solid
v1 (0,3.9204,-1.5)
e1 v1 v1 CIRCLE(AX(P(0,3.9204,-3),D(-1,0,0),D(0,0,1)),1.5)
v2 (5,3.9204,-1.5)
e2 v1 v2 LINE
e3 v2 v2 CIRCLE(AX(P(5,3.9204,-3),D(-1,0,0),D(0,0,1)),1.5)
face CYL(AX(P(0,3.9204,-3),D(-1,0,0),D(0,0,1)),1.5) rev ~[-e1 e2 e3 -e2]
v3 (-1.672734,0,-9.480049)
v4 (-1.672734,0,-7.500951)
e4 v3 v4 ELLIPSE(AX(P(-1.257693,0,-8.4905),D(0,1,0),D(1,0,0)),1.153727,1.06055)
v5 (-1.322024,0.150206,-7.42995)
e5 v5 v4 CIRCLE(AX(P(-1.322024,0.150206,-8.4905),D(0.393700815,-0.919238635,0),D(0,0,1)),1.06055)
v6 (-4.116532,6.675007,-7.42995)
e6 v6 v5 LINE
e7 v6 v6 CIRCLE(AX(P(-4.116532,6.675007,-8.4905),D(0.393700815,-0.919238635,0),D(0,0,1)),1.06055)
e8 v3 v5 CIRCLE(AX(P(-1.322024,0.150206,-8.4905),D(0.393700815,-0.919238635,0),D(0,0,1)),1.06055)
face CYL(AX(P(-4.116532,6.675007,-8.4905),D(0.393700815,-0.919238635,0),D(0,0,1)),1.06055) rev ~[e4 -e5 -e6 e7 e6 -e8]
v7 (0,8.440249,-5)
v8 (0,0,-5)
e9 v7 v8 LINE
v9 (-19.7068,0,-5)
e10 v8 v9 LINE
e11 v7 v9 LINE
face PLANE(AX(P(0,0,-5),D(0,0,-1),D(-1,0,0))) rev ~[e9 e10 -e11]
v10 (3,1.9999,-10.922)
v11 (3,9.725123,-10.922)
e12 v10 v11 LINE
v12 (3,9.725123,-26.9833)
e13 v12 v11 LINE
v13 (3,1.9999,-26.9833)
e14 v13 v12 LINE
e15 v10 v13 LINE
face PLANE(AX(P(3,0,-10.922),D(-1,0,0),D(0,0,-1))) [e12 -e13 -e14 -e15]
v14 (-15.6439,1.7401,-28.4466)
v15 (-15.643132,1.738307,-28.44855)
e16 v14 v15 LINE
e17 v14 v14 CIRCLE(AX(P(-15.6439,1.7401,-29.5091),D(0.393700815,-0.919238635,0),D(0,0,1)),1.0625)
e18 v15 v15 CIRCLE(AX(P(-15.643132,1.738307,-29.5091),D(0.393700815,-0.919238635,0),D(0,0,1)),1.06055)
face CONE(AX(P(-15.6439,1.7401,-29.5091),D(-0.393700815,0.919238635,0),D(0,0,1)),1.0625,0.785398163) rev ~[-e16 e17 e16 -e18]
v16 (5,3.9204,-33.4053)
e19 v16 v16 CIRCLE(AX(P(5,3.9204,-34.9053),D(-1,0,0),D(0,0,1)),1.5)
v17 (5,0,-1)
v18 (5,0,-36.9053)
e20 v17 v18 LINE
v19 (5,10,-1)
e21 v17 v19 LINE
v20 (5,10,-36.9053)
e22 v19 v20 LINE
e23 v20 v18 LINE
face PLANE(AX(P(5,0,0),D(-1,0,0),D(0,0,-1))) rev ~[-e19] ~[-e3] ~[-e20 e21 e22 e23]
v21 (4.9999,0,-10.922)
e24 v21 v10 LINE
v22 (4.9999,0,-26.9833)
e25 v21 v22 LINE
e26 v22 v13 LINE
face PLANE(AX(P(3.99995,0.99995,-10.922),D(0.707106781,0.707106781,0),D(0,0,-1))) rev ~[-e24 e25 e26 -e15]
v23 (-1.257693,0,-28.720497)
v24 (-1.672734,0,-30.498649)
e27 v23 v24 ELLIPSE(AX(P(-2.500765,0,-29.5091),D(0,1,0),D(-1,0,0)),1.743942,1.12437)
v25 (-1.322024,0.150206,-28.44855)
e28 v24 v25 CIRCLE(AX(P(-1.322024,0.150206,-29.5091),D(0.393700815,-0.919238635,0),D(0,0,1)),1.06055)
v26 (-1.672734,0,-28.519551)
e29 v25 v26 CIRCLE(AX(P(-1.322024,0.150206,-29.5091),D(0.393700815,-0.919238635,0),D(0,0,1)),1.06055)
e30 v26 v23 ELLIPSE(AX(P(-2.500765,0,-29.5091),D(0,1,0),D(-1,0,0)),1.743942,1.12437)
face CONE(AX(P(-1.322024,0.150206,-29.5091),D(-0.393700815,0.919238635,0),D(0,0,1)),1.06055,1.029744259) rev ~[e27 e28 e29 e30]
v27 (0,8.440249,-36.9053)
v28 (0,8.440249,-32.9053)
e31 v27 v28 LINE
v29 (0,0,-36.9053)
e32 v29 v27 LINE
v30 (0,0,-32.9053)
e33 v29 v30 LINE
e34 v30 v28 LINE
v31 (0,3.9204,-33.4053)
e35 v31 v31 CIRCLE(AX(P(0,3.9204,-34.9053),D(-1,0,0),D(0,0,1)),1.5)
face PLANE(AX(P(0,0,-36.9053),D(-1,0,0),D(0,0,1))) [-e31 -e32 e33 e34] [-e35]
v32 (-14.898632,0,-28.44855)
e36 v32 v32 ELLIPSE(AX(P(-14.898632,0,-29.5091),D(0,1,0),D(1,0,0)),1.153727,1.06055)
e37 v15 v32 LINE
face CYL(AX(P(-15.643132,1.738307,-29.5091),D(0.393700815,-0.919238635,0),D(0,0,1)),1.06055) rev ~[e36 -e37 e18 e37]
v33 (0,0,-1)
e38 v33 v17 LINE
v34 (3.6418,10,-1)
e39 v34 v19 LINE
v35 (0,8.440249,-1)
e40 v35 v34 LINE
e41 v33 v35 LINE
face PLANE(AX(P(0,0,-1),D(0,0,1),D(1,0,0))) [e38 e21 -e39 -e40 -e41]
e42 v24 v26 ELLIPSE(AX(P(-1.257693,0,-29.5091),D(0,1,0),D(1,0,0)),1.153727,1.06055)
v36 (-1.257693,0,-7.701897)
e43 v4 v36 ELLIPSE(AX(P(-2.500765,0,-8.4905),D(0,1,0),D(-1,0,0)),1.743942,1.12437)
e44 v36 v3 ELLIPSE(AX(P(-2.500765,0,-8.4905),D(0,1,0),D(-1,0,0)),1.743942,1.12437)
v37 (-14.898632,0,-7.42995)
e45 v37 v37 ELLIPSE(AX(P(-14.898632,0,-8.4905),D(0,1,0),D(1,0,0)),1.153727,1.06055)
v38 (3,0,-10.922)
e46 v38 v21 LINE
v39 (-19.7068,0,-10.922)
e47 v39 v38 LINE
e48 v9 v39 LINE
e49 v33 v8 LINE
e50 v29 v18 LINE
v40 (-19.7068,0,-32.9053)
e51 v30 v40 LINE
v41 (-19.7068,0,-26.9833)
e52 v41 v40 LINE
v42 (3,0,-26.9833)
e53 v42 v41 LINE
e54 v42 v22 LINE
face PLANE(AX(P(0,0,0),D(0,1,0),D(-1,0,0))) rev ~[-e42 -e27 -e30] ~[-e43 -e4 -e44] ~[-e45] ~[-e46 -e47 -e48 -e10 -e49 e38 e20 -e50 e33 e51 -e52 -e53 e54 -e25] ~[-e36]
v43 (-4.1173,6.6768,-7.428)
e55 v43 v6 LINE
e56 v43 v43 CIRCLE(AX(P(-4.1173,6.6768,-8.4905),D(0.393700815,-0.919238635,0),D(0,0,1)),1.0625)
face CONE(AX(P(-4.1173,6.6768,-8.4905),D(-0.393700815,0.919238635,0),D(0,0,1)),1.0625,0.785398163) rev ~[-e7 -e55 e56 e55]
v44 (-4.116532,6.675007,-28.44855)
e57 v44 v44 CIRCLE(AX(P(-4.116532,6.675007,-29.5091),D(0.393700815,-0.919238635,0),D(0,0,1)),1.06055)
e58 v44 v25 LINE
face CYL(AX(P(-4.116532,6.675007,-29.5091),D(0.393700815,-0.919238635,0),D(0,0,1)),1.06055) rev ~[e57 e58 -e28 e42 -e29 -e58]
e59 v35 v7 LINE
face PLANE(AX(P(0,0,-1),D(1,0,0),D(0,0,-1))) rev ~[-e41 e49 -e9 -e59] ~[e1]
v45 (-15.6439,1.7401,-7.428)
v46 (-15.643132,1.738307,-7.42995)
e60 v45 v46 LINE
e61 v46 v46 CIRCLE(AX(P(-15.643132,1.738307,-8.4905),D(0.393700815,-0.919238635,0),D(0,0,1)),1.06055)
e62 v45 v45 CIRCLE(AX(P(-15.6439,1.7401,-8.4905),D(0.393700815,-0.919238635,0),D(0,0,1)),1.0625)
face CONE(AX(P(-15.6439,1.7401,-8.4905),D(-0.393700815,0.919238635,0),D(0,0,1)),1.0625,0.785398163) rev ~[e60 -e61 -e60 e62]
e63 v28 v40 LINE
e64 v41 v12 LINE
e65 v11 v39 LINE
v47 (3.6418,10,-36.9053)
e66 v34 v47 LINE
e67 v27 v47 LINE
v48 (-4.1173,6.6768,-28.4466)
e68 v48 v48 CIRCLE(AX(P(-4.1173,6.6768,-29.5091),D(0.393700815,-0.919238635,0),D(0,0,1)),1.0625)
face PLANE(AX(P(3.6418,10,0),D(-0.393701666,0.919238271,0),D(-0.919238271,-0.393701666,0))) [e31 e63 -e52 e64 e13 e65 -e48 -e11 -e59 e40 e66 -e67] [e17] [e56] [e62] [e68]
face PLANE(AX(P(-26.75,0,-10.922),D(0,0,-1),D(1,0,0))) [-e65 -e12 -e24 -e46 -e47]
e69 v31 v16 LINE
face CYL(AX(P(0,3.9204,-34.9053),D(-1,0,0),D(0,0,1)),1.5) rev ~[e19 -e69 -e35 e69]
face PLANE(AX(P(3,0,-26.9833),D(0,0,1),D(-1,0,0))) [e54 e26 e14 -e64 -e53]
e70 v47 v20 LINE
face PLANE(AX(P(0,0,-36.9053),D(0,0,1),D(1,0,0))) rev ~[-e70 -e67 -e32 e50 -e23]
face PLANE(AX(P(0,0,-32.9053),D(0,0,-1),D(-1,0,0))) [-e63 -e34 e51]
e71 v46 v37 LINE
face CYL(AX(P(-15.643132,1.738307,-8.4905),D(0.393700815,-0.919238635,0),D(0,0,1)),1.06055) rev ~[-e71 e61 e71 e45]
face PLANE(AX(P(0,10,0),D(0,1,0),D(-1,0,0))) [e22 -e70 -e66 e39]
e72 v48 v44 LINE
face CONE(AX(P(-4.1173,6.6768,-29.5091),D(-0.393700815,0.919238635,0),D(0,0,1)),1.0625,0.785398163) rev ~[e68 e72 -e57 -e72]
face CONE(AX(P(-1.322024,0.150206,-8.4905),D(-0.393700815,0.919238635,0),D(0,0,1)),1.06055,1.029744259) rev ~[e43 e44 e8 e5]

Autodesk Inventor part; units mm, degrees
ref_plane "YZ Plane" through (0, 0, 0) normal (1, 0, 0) x (0, 1, 0)
ref_plane "XZ Plane" through (0, 0, 0) normal (0, 1, 0) x (-1, 0, 0)
sketch "Sketch2" plane through (0, 0, 0) normal (0, 1, 0) x (-1, 0, 0)
  line L0 (0, 0) -> (23.273, 0)
  line L1 (23.273, 0) -> (23.273, -37.9053)
  line L2 (23.273, -37.9053) -> (0, -37.9053)
  line L3 (0, -37.9053) -> (0, 0)
  line L4 (26.75, 0) -> (-5, 0)
  line L5 (-5, 0) -> (-5, -37.9053)
  line L6 (-5, -37.9053) -> (26.75, -37.9053)
  line L7 (26.75, -37.9053) -> (26.75, 0)
  point P0 (0, -37.9053)
  dimension "d21" = 37.9053
  dimension "d22" = 23.273
  dimension "d36" = 5
  dimension "d37" = 31.75
extrude "Extrusion1" add sketch "Sketch2" along normal blind 10
sketch "Sketch6" plane through (-26.75, 0, 0) normal (0, 0, 1) x (1, 0, 0)
  line L0 (31.75, 0) -> (31.75, 10) projected
  line L1 (31.75, 0) -> (31.75, 10)
  line L2 (31.75, 0) -> (0, 0) projected
  line L3 (30.3918, 0) -> (30.3918, 10)
  line L4 (31.75, 10) -> (0, 10) projected
  line L5 (30.3918, 10) -> (55.3918, 10) construction
  line L6 (0, 0) -> (0, 10) projected
  line L7 (0, 0) -> (0, 0.5)
  line L8 (30.3918, 10) -> (7.0432, 0)
  point P0 (26.75, 0)
  dimension "d38" = 1.3582
  dimension "d41" = 0.5
  dimension "d96" = 25.4
  dimension "d97" = 66.815
extrude "Extrusion2" cut sketch "Sketch6" against normal up to surface (37.9053 mm away) contours L8 L2 L6 L4
sketch "Sketch8" plane through (0, 0, 0) normal (0, -1, 0) x (1, 0, 0)
  line L0 (-26.75, -37.9053) -> (-26.75, 0) projected
  line L1 (-26.75, -10.922) -> (3, -10.922)
  line L2 (3, -10.922) -> (3, -26.9833)
  line L3 (3, -26.9833) -> (-26.75, -26.9833)
  line L4 (-26.75, -26.9833) -> (-26.75, -10.922)
  line L5 (-26.75, 0) -> (5, 0) projected
  line L6 (5, -37.9053) -> (-26.75, -37.9053) projected
  line L7 (5, 0) -> (5, -37.9053) projected
  point P0 (0, 0)
  point P1 (-26.75, -26.9833)
  dimension "d44" = 10.922
  dimension "d45" = 10.922
  dimension "d46" = 2
extrude "Extrusion3" cut sketch "Sketch8" against normal blind 25.4 contours L0 L1 L2 L3
ref_plane "Work Plane1" through (4.3209, 10, 0) normal (0, 1, 0) x (1, 0, 0)
sketch "Sketch12" plane through (0, 0, 0) normal (0, -1, 0) x (1, 0, 0)
  line L0 (3.6418, 0) -> (-26.75, 0) projected
  line L1 (-26.75, 0) -> (0, 0)
  line L2 (0, 0) -> (0, -5)
  line L3 (0, -5) -> (-26.75, -5)
  line L4 (-26.75, -5) -> (-26.75, 0)
  line L5 (-26.75, -37.9053) -> (0, -37.9053)
  line L6 (0, -37.9053) -> (0, -32.9053)
  line L7 (0, -32.9053) -> (-26.75, -32.9053)
  line L8 (-26.75, -32.9053) -> (-26.75, -37.9053)
  line L9 (5, 0) -> (0, 0)
  line L10 (0, 0) -> (0, -1)
  line L11 (0, -1) -> (5, -1)
  line L12 (5, -1) -> (5, 0)
  line L13 (5, 0) -> (5, -37.9053) projected
  line L14 (5, -37.9053) -> (0, -37.9053)
  line L15 (0, -37.9053) -> (0, -36.9053)
  line L16 (0, -36.9053) -> (5, -36.9053)
  line L17 (5, -36.9053) -> (5, -37.9053)
  line L18 (5, -37.9053) -> (-26.75, -37.9053) projected
  point P0 (0, -37.9053)
  dimension "d69" = 5
  dimension "d70" = 5
  dimension "d73" = 1
  dimension "d74" = 1
  dimension "d75" = 0
extrude "Extrusion6" cut sketch "Sketch12" along normal through all both and the other way through all
sketch "Sketch13" plane through (0, 0, -36.9053) normal (-1, 0, 0) x (0, 0, 1)
  circle A0 centre (2, 3.9204) radius 1.5
  circle A1 centre (33.9053, 3.9204) radius 1.5
  line L0 (35.9053, 0) -> (31.9053, 0) projected
  line L1 (31.9053, 7.8408) -> (35.9053, 7.8408) projected
  line L2 (35.9053, 8.4402) -> (35.9053, 0) projected
  line L3 (31.9053, 2) -> (31.9053, 7.8408) projected
  line L4 (0, 0) -> (0, 8.4402) projected
  line L5 (0, 7.8408) -> (4, 7.8408) projected
  line L6 (4, 0) -> (0, 0) projected
  point P0 (36.9053, 0)
  point P1 (35.9053, 8.636)
  point P2 (0, 8.636)
  dimension "d80" = 3
  dimension "d81" = 3
  dimension "d82" = 7.8408
  dimension "d83" = 3.9204
  dimension "d84" = 4
  dimension "d85" = 2
  dimension "d86" = 2
  dimension "d87" = 3.9204
  dimension "d88" = 31.9053
  dimension "d148" = 3.9204
extrude "Extrusion7" cut sketch "Sketch13" against normal blind 25.4
sketch "Sketch15" plane through (3, 9.7251, -10.922) normal (-0.3937008, 0.9192386, 0) x (0.9192386, 0.3937008, 0)
  circle A0 centre (-20.2819, -2.4315) radius 1.1146
  circle A1 centre (-7.7426, 18.5871) radius 1.229
  line L0 (-20.2819, -2.4315) -> (-20.2819, 18.5871)
  line L1 (-20.2819, 18.5871) -> (-7.7426, 18.5871)
  line L2 (-7.7426, 18.5871) -> (-7.7426, -2.4315)
  line L3 (-7.7426, -2.4315) -> (-20.2819, -2.4315)
  line L4 (-12.8147, 2.62) -> (-12.8147, 13.4413)
  line L5 (-12.8147, 13.4413) -> (-2.3681, 13.4413)
  line L6 (-2.3681, 13.4413) -> (-2.3681, 2.62)
  line L7 (-2.3681, 2.62) -> (-12.8147, 2.62)
  line L8 (-22.0533, -4.4694) -> (-22.0533, 20.5306)
  line L9 (-22.0533, 20.5306) -> (1.9467, 20.5306)
  line L10 (1.9467, 20.5306) -> (1.9467, -4.4694)
  line L11 (1.9467, -4.4694) -> (-22.0533, -4.4694)
  line L12 (-3.2636, 21.9833) -> (-24.7018, 21.9833) projected
  line L13 (-24.7018, -5.922) -> (-3.2636, -5.922) projected
  circle A2 centre (-20.2819, 18.5871) radius 1.1245
  line L14 (0, 16.0613) -> (0, 0) projected
  line L15 (1.9467, -9.922) -> (1.9467, 25.9833) projected
  circle A3 centre (-7.7426, -2.4315) radius 1.1245
  point P0 (-6.5865, -10.922)
  dimension "d107" = 21.0186
  dimension "d108" = 12.5392
  dimension "d110" = 25
  dimension "d111" = 24
  dimension "d112" = 4.3148
  dimension "d113" = 9.2386
  dimension "d114" = 7.0893
  dimension "d115" = 7.0893
  dimension "d117" = 1.9436
  dimension "d118" = 2.0378
  dimension "d119" = 1.7714
  dimension "d120" = 9.6893
  dimension "d122" = 1.4526
  dimension "d123" = 1.4526
  dimension "d124" = 2.249
  dimension "d133" = 0
  dimension "d134" = 2.249
hole "Hole3" at (-15.6439, 1.7401, -8.4905) at (-4.1173, 6.6768, -8.4905) at (-4.1173, 6.6768, -29.5091) at (-15.6439, 1.7401, -29.5091) direction (0.3937008, -0.9192386, 0) diameter 2.1211 depth 7.1 tip angle 118 countersink diameter 2.125 countersink angle 90 thread size "M2.5x0.35" class "6H" standard "ANSI Metric M Profile"
chamfer "Chamfer3" distance 2 distance2 2 1 edges at (3, 0, -18.9526) measured on face at (4.3333, 0, -21.6295)
equation "\"d83\" = 0.5 * d82"
equation "\"d85\" = 0.5 * d84"
equation "\"d86\" = d85"
equation "\"d87\" = d83"
equation "\"d115\" = d114"
equation "\"d122\" = d123"
properties part number "Camera Angle"
